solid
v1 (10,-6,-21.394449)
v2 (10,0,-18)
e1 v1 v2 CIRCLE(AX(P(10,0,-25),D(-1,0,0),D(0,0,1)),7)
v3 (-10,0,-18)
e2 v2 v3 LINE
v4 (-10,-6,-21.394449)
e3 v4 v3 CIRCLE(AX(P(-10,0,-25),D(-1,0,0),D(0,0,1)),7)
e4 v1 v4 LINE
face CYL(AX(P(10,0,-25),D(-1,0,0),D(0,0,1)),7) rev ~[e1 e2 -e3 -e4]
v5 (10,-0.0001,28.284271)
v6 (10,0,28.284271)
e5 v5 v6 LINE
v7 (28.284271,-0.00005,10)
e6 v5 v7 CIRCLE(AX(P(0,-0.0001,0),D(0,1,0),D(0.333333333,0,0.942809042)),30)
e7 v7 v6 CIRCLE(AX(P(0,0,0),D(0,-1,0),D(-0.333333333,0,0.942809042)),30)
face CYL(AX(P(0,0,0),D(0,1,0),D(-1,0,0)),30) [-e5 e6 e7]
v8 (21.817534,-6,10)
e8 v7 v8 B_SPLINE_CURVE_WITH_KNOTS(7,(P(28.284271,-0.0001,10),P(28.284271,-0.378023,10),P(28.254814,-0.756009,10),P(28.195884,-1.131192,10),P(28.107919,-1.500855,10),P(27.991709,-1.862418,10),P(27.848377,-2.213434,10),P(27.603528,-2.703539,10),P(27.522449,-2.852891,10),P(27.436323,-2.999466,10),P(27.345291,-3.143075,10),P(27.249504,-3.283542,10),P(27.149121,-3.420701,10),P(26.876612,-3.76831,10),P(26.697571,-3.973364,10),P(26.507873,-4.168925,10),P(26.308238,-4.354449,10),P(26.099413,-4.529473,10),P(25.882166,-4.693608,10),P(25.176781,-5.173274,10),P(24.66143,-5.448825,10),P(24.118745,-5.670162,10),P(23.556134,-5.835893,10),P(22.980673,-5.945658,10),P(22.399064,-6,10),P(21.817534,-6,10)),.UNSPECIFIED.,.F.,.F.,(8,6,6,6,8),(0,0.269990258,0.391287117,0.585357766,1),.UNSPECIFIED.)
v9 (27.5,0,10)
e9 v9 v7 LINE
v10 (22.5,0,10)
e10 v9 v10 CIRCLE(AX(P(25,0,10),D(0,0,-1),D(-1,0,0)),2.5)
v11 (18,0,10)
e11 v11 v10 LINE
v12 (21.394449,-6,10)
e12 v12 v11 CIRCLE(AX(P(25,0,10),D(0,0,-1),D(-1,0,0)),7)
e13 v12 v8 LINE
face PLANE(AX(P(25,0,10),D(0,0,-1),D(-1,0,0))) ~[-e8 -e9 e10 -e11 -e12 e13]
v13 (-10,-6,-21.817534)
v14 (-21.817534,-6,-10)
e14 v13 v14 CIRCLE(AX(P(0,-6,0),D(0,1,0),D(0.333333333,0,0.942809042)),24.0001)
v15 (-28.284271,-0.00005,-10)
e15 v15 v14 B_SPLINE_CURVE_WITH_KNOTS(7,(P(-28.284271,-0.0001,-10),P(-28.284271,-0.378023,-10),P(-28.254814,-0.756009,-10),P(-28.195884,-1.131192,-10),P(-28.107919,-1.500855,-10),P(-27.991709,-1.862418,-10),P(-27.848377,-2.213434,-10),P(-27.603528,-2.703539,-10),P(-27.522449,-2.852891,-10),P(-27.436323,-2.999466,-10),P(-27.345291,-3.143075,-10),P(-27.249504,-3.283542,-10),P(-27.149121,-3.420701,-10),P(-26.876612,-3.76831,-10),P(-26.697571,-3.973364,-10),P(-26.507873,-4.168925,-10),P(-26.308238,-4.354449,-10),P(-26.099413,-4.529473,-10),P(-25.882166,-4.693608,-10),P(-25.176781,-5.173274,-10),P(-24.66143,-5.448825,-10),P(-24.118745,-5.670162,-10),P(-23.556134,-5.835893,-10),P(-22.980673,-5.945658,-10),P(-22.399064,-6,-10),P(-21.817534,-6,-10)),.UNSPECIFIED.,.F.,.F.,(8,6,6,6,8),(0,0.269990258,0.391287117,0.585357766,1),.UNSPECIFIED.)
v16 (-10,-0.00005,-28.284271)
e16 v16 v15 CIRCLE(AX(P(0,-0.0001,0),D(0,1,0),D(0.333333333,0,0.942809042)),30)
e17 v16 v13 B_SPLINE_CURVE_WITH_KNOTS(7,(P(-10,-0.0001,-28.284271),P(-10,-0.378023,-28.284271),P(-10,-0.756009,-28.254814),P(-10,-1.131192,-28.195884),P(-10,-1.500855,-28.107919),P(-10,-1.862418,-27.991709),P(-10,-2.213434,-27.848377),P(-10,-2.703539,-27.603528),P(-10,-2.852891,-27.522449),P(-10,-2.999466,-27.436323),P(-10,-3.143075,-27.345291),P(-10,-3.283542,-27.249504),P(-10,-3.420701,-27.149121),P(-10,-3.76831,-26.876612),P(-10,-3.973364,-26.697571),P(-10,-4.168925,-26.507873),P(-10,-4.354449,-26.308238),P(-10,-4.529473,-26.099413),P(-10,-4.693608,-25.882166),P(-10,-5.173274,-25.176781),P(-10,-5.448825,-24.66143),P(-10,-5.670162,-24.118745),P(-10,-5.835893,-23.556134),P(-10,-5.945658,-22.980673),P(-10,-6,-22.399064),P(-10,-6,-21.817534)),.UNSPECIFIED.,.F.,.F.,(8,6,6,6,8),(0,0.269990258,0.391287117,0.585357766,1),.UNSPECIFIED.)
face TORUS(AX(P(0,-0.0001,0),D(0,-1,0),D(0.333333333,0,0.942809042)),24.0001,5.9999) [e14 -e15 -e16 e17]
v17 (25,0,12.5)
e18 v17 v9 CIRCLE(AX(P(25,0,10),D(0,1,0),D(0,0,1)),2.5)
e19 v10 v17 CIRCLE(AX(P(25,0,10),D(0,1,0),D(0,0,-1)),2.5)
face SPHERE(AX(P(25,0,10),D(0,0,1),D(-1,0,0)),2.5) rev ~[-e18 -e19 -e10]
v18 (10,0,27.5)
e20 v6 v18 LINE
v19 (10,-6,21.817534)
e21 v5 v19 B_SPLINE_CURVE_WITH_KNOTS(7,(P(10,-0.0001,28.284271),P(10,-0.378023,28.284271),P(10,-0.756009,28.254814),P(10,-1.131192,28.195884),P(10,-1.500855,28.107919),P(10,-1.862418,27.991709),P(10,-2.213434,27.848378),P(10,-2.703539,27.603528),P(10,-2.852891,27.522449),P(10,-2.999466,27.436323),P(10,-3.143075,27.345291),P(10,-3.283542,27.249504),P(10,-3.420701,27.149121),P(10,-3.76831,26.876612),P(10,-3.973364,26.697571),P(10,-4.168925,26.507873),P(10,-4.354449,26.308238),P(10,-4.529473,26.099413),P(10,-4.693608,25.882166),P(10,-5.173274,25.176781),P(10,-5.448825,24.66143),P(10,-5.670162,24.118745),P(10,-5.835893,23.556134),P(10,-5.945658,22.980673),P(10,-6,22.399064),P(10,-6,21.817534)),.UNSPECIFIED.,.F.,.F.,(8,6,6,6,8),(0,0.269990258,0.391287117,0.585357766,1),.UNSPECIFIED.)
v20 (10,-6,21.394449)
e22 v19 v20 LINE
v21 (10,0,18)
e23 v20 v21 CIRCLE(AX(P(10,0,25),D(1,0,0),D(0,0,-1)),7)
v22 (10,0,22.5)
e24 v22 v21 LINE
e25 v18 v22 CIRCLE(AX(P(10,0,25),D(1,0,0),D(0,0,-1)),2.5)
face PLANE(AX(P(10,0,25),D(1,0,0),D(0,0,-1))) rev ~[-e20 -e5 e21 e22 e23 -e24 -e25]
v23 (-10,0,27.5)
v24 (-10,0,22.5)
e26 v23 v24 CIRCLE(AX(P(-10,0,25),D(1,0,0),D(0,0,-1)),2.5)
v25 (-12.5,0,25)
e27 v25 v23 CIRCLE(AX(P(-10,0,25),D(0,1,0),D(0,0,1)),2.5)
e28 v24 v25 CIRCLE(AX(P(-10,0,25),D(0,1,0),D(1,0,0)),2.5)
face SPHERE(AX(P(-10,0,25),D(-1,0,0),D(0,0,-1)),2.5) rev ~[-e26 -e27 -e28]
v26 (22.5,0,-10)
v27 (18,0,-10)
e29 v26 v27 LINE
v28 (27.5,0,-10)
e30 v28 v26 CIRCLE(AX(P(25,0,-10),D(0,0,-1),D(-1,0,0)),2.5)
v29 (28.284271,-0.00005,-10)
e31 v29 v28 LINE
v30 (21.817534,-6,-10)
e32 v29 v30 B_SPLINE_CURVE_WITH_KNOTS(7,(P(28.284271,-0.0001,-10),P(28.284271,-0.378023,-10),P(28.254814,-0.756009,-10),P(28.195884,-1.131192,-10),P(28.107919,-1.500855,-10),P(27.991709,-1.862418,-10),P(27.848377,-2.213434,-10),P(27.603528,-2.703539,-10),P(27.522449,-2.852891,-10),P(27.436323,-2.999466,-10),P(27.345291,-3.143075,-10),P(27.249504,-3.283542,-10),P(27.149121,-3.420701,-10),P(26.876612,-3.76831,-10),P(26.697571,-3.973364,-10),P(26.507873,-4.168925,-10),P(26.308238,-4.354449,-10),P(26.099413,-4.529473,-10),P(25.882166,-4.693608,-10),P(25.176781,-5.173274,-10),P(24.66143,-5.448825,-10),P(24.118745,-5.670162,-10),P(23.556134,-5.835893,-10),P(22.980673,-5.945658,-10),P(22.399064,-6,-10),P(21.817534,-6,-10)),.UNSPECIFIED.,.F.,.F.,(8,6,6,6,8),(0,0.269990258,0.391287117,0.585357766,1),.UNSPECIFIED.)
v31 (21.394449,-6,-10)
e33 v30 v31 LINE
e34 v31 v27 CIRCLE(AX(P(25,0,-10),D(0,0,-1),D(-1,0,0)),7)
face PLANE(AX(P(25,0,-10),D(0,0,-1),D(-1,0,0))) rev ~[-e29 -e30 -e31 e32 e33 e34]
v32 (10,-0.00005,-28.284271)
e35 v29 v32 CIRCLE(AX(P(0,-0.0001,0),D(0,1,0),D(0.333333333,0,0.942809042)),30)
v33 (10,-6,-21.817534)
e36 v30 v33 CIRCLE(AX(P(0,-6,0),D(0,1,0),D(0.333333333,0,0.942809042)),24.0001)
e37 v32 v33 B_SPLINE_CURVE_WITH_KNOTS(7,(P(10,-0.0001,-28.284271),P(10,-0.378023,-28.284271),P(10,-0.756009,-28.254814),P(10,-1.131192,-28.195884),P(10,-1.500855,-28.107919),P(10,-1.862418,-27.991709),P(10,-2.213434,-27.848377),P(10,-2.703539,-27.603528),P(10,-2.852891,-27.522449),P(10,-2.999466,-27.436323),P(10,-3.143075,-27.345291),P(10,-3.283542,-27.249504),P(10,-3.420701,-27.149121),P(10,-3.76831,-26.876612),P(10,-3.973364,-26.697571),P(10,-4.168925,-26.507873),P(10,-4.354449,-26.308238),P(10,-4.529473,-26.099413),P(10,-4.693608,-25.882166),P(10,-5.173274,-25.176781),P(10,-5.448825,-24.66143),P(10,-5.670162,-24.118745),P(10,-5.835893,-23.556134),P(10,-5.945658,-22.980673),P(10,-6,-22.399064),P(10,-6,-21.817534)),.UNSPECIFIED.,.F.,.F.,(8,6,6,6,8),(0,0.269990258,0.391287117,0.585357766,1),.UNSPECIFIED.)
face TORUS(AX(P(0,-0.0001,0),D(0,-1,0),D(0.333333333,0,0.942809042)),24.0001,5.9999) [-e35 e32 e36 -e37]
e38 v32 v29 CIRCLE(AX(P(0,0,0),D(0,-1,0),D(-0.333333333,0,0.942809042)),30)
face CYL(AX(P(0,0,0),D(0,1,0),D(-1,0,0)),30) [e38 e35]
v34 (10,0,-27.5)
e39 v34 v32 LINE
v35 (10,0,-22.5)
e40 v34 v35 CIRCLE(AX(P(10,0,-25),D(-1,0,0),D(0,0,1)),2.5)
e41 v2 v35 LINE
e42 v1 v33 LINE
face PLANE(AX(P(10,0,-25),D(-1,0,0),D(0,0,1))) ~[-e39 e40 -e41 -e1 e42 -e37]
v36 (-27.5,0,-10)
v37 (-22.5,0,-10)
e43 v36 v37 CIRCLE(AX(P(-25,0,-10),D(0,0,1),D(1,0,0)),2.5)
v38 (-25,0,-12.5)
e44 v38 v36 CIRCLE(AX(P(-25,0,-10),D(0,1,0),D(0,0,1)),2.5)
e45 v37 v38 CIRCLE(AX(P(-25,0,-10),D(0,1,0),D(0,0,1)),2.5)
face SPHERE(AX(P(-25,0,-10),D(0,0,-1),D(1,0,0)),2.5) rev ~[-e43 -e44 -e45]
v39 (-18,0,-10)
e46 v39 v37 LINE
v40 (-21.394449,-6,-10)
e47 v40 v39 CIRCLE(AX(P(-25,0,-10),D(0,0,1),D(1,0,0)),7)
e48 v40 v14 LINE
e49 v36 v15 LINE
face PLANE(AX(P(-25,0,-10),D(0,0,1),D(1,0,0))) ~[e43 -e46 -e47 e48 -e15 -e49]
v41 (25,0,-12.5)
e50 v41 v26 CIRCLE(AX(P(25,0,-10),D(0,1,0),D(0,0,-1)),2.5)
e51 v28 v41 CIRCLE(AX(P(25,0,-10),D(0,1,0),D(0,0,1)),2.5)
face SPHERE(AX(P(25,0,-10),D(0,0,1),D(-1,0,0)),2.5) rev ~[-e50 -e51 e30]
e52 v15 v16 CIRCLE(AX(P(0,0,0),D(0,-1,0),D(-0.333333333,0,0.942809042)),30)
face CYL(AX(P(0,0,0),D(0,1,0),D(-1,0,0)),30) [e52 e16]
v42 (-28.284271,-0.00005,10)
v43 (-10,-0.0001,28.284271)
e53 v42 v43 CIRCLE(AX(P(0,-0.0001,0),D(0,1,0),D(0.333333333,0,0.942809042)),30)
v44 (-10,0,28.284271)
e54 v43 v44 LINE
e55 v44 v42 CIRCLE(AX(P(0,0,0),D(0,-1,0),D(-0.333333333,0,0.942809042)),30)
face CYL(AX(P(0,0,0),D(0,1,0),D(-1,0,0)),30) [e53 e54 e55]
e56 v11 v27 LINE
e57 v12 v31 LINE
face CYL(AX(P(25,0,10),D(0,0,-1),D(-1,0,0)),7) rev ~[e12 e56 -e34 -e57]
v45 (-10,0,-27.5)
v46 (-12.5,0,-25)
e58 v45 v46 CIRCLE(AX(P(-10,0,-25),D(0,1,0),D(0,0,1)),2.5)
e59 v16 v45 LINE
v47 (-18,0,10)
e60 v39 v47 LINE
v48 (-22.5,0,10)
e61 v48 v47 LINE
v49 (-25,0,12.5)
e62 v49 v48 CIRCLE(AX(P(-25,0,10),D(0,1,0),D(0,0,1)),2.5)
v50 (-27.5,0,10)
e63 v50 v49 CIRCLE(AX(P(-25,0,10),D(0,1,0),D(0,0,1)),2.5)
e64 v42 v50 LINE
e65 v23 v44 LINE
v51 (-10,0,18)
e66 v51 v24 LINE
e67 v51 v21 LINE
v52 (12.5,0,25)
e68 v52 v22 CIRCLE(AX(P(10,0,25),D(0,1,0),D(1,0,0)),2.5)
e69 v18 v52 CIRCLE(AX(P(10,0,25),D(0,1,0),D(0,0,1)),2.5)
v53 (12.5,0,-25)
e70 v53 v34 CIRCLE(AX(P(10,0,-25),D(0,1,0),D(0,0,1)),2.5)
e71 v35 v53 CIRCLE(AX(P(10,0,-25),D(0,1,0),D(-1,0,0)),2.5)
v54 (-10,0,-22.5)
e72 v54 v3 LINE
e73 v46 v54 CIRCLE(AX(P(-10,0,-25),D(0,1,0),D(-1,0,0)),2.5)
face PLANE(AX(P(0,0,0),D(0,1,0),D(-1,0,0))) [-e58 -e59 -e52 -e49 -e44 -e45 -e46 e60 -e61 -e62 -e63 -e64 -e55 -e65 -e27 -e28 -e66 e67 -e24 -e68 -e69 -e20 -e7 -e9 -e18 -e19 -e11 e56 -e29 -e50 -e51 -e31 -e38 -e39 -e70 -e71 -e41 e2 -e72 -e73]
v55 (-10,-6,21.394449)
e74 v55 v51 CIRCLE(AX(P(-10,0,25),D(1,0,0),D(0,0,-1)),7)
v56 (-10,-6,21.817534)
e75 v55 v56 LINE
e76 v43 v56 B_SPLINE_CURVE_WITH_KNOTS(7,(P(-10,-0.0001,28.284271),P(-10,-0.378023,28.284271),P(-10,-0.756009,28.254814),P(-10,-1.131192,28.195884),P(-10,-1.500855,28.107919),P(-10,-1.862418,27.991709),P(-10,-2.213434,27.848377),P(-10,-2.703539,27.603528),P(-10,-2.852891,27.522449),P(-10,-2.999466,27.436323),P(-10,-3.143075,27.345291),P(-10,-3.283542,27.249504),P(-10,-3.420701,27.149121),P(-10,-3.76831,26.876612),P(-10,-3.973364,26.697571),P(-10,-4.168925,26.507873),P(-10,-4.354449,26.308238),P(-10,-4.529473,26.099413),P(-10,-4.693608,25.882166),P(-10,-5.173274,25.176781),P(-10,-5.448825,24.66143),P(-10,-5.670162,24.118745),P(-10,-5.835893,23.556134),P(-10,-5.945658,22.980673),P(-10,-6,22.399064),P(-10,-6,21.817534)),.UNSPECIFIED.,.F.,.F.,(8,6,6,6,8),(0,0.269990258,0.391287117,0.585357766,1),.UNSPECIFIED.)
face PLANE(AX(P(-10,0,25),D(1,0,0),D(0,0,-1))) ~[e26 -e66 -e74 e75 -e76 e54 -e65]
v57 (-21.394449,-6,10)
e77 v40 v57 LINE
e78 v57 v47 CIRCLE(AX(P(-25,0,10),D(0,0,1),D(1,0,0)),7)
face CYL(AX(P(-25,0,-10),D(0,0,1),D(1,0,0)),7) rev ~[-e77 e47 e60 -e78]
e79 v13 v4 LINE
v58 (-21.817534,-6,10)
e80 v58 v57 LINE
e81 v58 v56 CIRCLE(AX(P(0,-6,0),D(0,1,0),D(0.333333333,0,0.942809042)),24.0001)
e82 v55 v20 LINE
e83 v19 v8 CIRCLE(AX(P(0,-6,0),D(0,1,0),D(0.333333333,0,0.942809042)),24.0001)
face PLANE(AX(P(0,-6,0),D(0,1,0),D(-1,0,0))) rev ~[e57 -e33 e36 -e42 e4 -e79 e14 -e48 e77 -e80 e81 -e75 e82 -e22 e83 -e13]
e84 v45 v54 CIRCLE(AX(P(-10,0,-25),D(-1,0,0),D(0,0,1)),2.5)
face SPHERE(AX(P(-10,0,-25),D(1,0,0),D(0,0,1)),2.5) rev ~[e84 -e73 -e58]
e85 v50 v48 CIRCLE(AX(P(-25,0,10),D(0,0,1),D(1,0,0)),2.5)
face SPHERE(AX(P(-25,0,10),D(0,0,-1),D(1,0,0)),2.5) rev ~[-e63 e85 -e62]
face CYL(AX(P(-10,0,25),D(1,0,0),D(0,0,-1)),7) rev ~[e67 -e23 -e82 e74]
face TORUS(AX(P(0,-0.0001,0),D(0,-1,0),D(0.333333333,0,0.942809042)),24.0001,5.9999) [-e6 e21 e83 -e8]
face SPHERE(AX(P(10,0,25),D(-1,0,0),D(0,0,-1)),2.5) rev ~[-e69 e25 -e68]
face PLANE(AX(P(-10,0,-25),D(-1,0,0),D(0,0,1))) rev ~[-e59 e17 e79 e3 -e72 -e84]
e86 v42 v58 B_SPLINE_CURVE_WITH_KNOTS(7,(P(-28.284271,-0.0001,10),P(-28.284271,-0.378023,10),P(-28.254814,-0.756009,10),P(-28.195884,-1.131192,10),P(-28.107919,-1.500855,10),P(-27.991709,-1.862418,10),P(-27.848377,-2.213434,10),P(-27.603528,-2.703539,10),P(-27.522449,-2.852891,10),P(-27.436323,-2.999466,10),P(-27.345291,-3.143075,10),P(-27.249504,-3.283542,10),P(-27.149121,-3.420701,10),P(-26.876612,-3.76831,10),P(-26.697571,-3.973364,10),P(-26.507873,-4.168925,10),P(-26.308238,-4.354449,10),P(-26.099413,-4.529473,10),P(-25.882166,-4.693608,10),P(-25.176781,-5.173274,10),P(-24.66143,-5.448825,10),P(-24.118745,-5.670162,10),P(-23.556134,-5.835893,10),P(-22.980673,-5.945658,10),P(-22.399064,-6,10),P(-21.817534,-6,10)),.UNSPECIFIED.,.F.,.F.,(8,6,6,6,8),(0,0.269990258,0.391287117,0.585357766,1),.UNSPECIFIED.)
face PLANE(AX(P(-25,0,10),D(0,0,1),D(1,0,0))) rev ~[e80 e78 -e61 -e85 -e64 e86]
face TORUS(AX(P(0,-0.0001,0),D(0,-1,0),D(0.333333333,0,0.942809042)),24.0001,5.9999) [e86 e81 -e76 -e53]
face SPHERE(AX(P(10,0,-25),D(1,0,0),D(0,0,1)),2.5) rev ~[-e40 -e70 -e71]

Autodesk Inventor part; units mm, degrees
ref_plane "YZ Plane" through (0, 0, 0) normal (1, 0, 0) x (0, 1, 0)
ref_plane "XZ Plane" through (0, 0, 0) normal (0, 1, 0) x (-1, 0, 0)
ref_plane "XY Plane" through (0, 0, 0) normal (0, 0, 1) x (1, 0, 0)
sketch "Sketch1" plane through (0, 0, 0) normal (0, 1, 0) x (-1, 0, 0)
  circle A0 centre (0, 0) radius 30
  dimension "d0" = 60
extrude "Extrusion1" add sketch "Sketch1" against normal blind 6
sketch "Sketch2" plane through (0, 0, 0) normal (0, 1, 0) x (1, 0, 0)
  line L0 (-10, -18) -> (10, -18)
  line L1 (10, -32) -> (-10, -32)
  line L2 (-10, -18) -> (10, -32) construction
  line L3 (10, -18) -> (-10, -32) construction
  arc A0 (-7.5, -25) -> (-12.5, -25) centre (-10, -25) ccw
  arc A1 (12.5, -25) -> (7.5, -25) centre (10, -25) ccw
  line L4 (-12.5, -25) -> (12.5, -25)
  line L5 (-10, -32) -> (-10, -27.5)
  line L6 (-10, -25) -> (-10, -18)
  line L7 (10, -18) -> (10, -25)
  line L8 (10, -27.5) -> (10, -32)
  point P0 (0, 0)
  point P1 (0, -25)
  dimension "d3" = 20
  dimension "d4" = 25
  dimension "d5" = 14
  dimension "d6" = 5
  dimension "d7" = 5
revolve "Revolution1" cut sketch "Sketch2" angle 360 about axis through (-12.5, 0, 25) along (1, 0, 0)
sketch "Sketch3" plane through (0, -6, 0) normal (0, -1, 0) x (1, 0, 0)
  arc A0 (9.04, 28.6056) -> (-9.04, 28.6056) centre (0, 0) ccw projected
  line L0 (-9.04, 28.6056) -> (9.04, 28.6056) projected
  arc A1 (9.04, 28.6056) -> (-9.04, 28.6056) centre (0, 0) ccw projected
extrude "Extrusion2" cut sketch "Sketch3" against normal through all
fillet "Fillet1" radius 6 1 edges at (0, -6, -30)
pattern_circular "Circular Pattern1" count 4 over 360 about axis through (0, -10, 0) along (0, 1, 0) of "Revolution1"
properties part number "wheel_cover"
